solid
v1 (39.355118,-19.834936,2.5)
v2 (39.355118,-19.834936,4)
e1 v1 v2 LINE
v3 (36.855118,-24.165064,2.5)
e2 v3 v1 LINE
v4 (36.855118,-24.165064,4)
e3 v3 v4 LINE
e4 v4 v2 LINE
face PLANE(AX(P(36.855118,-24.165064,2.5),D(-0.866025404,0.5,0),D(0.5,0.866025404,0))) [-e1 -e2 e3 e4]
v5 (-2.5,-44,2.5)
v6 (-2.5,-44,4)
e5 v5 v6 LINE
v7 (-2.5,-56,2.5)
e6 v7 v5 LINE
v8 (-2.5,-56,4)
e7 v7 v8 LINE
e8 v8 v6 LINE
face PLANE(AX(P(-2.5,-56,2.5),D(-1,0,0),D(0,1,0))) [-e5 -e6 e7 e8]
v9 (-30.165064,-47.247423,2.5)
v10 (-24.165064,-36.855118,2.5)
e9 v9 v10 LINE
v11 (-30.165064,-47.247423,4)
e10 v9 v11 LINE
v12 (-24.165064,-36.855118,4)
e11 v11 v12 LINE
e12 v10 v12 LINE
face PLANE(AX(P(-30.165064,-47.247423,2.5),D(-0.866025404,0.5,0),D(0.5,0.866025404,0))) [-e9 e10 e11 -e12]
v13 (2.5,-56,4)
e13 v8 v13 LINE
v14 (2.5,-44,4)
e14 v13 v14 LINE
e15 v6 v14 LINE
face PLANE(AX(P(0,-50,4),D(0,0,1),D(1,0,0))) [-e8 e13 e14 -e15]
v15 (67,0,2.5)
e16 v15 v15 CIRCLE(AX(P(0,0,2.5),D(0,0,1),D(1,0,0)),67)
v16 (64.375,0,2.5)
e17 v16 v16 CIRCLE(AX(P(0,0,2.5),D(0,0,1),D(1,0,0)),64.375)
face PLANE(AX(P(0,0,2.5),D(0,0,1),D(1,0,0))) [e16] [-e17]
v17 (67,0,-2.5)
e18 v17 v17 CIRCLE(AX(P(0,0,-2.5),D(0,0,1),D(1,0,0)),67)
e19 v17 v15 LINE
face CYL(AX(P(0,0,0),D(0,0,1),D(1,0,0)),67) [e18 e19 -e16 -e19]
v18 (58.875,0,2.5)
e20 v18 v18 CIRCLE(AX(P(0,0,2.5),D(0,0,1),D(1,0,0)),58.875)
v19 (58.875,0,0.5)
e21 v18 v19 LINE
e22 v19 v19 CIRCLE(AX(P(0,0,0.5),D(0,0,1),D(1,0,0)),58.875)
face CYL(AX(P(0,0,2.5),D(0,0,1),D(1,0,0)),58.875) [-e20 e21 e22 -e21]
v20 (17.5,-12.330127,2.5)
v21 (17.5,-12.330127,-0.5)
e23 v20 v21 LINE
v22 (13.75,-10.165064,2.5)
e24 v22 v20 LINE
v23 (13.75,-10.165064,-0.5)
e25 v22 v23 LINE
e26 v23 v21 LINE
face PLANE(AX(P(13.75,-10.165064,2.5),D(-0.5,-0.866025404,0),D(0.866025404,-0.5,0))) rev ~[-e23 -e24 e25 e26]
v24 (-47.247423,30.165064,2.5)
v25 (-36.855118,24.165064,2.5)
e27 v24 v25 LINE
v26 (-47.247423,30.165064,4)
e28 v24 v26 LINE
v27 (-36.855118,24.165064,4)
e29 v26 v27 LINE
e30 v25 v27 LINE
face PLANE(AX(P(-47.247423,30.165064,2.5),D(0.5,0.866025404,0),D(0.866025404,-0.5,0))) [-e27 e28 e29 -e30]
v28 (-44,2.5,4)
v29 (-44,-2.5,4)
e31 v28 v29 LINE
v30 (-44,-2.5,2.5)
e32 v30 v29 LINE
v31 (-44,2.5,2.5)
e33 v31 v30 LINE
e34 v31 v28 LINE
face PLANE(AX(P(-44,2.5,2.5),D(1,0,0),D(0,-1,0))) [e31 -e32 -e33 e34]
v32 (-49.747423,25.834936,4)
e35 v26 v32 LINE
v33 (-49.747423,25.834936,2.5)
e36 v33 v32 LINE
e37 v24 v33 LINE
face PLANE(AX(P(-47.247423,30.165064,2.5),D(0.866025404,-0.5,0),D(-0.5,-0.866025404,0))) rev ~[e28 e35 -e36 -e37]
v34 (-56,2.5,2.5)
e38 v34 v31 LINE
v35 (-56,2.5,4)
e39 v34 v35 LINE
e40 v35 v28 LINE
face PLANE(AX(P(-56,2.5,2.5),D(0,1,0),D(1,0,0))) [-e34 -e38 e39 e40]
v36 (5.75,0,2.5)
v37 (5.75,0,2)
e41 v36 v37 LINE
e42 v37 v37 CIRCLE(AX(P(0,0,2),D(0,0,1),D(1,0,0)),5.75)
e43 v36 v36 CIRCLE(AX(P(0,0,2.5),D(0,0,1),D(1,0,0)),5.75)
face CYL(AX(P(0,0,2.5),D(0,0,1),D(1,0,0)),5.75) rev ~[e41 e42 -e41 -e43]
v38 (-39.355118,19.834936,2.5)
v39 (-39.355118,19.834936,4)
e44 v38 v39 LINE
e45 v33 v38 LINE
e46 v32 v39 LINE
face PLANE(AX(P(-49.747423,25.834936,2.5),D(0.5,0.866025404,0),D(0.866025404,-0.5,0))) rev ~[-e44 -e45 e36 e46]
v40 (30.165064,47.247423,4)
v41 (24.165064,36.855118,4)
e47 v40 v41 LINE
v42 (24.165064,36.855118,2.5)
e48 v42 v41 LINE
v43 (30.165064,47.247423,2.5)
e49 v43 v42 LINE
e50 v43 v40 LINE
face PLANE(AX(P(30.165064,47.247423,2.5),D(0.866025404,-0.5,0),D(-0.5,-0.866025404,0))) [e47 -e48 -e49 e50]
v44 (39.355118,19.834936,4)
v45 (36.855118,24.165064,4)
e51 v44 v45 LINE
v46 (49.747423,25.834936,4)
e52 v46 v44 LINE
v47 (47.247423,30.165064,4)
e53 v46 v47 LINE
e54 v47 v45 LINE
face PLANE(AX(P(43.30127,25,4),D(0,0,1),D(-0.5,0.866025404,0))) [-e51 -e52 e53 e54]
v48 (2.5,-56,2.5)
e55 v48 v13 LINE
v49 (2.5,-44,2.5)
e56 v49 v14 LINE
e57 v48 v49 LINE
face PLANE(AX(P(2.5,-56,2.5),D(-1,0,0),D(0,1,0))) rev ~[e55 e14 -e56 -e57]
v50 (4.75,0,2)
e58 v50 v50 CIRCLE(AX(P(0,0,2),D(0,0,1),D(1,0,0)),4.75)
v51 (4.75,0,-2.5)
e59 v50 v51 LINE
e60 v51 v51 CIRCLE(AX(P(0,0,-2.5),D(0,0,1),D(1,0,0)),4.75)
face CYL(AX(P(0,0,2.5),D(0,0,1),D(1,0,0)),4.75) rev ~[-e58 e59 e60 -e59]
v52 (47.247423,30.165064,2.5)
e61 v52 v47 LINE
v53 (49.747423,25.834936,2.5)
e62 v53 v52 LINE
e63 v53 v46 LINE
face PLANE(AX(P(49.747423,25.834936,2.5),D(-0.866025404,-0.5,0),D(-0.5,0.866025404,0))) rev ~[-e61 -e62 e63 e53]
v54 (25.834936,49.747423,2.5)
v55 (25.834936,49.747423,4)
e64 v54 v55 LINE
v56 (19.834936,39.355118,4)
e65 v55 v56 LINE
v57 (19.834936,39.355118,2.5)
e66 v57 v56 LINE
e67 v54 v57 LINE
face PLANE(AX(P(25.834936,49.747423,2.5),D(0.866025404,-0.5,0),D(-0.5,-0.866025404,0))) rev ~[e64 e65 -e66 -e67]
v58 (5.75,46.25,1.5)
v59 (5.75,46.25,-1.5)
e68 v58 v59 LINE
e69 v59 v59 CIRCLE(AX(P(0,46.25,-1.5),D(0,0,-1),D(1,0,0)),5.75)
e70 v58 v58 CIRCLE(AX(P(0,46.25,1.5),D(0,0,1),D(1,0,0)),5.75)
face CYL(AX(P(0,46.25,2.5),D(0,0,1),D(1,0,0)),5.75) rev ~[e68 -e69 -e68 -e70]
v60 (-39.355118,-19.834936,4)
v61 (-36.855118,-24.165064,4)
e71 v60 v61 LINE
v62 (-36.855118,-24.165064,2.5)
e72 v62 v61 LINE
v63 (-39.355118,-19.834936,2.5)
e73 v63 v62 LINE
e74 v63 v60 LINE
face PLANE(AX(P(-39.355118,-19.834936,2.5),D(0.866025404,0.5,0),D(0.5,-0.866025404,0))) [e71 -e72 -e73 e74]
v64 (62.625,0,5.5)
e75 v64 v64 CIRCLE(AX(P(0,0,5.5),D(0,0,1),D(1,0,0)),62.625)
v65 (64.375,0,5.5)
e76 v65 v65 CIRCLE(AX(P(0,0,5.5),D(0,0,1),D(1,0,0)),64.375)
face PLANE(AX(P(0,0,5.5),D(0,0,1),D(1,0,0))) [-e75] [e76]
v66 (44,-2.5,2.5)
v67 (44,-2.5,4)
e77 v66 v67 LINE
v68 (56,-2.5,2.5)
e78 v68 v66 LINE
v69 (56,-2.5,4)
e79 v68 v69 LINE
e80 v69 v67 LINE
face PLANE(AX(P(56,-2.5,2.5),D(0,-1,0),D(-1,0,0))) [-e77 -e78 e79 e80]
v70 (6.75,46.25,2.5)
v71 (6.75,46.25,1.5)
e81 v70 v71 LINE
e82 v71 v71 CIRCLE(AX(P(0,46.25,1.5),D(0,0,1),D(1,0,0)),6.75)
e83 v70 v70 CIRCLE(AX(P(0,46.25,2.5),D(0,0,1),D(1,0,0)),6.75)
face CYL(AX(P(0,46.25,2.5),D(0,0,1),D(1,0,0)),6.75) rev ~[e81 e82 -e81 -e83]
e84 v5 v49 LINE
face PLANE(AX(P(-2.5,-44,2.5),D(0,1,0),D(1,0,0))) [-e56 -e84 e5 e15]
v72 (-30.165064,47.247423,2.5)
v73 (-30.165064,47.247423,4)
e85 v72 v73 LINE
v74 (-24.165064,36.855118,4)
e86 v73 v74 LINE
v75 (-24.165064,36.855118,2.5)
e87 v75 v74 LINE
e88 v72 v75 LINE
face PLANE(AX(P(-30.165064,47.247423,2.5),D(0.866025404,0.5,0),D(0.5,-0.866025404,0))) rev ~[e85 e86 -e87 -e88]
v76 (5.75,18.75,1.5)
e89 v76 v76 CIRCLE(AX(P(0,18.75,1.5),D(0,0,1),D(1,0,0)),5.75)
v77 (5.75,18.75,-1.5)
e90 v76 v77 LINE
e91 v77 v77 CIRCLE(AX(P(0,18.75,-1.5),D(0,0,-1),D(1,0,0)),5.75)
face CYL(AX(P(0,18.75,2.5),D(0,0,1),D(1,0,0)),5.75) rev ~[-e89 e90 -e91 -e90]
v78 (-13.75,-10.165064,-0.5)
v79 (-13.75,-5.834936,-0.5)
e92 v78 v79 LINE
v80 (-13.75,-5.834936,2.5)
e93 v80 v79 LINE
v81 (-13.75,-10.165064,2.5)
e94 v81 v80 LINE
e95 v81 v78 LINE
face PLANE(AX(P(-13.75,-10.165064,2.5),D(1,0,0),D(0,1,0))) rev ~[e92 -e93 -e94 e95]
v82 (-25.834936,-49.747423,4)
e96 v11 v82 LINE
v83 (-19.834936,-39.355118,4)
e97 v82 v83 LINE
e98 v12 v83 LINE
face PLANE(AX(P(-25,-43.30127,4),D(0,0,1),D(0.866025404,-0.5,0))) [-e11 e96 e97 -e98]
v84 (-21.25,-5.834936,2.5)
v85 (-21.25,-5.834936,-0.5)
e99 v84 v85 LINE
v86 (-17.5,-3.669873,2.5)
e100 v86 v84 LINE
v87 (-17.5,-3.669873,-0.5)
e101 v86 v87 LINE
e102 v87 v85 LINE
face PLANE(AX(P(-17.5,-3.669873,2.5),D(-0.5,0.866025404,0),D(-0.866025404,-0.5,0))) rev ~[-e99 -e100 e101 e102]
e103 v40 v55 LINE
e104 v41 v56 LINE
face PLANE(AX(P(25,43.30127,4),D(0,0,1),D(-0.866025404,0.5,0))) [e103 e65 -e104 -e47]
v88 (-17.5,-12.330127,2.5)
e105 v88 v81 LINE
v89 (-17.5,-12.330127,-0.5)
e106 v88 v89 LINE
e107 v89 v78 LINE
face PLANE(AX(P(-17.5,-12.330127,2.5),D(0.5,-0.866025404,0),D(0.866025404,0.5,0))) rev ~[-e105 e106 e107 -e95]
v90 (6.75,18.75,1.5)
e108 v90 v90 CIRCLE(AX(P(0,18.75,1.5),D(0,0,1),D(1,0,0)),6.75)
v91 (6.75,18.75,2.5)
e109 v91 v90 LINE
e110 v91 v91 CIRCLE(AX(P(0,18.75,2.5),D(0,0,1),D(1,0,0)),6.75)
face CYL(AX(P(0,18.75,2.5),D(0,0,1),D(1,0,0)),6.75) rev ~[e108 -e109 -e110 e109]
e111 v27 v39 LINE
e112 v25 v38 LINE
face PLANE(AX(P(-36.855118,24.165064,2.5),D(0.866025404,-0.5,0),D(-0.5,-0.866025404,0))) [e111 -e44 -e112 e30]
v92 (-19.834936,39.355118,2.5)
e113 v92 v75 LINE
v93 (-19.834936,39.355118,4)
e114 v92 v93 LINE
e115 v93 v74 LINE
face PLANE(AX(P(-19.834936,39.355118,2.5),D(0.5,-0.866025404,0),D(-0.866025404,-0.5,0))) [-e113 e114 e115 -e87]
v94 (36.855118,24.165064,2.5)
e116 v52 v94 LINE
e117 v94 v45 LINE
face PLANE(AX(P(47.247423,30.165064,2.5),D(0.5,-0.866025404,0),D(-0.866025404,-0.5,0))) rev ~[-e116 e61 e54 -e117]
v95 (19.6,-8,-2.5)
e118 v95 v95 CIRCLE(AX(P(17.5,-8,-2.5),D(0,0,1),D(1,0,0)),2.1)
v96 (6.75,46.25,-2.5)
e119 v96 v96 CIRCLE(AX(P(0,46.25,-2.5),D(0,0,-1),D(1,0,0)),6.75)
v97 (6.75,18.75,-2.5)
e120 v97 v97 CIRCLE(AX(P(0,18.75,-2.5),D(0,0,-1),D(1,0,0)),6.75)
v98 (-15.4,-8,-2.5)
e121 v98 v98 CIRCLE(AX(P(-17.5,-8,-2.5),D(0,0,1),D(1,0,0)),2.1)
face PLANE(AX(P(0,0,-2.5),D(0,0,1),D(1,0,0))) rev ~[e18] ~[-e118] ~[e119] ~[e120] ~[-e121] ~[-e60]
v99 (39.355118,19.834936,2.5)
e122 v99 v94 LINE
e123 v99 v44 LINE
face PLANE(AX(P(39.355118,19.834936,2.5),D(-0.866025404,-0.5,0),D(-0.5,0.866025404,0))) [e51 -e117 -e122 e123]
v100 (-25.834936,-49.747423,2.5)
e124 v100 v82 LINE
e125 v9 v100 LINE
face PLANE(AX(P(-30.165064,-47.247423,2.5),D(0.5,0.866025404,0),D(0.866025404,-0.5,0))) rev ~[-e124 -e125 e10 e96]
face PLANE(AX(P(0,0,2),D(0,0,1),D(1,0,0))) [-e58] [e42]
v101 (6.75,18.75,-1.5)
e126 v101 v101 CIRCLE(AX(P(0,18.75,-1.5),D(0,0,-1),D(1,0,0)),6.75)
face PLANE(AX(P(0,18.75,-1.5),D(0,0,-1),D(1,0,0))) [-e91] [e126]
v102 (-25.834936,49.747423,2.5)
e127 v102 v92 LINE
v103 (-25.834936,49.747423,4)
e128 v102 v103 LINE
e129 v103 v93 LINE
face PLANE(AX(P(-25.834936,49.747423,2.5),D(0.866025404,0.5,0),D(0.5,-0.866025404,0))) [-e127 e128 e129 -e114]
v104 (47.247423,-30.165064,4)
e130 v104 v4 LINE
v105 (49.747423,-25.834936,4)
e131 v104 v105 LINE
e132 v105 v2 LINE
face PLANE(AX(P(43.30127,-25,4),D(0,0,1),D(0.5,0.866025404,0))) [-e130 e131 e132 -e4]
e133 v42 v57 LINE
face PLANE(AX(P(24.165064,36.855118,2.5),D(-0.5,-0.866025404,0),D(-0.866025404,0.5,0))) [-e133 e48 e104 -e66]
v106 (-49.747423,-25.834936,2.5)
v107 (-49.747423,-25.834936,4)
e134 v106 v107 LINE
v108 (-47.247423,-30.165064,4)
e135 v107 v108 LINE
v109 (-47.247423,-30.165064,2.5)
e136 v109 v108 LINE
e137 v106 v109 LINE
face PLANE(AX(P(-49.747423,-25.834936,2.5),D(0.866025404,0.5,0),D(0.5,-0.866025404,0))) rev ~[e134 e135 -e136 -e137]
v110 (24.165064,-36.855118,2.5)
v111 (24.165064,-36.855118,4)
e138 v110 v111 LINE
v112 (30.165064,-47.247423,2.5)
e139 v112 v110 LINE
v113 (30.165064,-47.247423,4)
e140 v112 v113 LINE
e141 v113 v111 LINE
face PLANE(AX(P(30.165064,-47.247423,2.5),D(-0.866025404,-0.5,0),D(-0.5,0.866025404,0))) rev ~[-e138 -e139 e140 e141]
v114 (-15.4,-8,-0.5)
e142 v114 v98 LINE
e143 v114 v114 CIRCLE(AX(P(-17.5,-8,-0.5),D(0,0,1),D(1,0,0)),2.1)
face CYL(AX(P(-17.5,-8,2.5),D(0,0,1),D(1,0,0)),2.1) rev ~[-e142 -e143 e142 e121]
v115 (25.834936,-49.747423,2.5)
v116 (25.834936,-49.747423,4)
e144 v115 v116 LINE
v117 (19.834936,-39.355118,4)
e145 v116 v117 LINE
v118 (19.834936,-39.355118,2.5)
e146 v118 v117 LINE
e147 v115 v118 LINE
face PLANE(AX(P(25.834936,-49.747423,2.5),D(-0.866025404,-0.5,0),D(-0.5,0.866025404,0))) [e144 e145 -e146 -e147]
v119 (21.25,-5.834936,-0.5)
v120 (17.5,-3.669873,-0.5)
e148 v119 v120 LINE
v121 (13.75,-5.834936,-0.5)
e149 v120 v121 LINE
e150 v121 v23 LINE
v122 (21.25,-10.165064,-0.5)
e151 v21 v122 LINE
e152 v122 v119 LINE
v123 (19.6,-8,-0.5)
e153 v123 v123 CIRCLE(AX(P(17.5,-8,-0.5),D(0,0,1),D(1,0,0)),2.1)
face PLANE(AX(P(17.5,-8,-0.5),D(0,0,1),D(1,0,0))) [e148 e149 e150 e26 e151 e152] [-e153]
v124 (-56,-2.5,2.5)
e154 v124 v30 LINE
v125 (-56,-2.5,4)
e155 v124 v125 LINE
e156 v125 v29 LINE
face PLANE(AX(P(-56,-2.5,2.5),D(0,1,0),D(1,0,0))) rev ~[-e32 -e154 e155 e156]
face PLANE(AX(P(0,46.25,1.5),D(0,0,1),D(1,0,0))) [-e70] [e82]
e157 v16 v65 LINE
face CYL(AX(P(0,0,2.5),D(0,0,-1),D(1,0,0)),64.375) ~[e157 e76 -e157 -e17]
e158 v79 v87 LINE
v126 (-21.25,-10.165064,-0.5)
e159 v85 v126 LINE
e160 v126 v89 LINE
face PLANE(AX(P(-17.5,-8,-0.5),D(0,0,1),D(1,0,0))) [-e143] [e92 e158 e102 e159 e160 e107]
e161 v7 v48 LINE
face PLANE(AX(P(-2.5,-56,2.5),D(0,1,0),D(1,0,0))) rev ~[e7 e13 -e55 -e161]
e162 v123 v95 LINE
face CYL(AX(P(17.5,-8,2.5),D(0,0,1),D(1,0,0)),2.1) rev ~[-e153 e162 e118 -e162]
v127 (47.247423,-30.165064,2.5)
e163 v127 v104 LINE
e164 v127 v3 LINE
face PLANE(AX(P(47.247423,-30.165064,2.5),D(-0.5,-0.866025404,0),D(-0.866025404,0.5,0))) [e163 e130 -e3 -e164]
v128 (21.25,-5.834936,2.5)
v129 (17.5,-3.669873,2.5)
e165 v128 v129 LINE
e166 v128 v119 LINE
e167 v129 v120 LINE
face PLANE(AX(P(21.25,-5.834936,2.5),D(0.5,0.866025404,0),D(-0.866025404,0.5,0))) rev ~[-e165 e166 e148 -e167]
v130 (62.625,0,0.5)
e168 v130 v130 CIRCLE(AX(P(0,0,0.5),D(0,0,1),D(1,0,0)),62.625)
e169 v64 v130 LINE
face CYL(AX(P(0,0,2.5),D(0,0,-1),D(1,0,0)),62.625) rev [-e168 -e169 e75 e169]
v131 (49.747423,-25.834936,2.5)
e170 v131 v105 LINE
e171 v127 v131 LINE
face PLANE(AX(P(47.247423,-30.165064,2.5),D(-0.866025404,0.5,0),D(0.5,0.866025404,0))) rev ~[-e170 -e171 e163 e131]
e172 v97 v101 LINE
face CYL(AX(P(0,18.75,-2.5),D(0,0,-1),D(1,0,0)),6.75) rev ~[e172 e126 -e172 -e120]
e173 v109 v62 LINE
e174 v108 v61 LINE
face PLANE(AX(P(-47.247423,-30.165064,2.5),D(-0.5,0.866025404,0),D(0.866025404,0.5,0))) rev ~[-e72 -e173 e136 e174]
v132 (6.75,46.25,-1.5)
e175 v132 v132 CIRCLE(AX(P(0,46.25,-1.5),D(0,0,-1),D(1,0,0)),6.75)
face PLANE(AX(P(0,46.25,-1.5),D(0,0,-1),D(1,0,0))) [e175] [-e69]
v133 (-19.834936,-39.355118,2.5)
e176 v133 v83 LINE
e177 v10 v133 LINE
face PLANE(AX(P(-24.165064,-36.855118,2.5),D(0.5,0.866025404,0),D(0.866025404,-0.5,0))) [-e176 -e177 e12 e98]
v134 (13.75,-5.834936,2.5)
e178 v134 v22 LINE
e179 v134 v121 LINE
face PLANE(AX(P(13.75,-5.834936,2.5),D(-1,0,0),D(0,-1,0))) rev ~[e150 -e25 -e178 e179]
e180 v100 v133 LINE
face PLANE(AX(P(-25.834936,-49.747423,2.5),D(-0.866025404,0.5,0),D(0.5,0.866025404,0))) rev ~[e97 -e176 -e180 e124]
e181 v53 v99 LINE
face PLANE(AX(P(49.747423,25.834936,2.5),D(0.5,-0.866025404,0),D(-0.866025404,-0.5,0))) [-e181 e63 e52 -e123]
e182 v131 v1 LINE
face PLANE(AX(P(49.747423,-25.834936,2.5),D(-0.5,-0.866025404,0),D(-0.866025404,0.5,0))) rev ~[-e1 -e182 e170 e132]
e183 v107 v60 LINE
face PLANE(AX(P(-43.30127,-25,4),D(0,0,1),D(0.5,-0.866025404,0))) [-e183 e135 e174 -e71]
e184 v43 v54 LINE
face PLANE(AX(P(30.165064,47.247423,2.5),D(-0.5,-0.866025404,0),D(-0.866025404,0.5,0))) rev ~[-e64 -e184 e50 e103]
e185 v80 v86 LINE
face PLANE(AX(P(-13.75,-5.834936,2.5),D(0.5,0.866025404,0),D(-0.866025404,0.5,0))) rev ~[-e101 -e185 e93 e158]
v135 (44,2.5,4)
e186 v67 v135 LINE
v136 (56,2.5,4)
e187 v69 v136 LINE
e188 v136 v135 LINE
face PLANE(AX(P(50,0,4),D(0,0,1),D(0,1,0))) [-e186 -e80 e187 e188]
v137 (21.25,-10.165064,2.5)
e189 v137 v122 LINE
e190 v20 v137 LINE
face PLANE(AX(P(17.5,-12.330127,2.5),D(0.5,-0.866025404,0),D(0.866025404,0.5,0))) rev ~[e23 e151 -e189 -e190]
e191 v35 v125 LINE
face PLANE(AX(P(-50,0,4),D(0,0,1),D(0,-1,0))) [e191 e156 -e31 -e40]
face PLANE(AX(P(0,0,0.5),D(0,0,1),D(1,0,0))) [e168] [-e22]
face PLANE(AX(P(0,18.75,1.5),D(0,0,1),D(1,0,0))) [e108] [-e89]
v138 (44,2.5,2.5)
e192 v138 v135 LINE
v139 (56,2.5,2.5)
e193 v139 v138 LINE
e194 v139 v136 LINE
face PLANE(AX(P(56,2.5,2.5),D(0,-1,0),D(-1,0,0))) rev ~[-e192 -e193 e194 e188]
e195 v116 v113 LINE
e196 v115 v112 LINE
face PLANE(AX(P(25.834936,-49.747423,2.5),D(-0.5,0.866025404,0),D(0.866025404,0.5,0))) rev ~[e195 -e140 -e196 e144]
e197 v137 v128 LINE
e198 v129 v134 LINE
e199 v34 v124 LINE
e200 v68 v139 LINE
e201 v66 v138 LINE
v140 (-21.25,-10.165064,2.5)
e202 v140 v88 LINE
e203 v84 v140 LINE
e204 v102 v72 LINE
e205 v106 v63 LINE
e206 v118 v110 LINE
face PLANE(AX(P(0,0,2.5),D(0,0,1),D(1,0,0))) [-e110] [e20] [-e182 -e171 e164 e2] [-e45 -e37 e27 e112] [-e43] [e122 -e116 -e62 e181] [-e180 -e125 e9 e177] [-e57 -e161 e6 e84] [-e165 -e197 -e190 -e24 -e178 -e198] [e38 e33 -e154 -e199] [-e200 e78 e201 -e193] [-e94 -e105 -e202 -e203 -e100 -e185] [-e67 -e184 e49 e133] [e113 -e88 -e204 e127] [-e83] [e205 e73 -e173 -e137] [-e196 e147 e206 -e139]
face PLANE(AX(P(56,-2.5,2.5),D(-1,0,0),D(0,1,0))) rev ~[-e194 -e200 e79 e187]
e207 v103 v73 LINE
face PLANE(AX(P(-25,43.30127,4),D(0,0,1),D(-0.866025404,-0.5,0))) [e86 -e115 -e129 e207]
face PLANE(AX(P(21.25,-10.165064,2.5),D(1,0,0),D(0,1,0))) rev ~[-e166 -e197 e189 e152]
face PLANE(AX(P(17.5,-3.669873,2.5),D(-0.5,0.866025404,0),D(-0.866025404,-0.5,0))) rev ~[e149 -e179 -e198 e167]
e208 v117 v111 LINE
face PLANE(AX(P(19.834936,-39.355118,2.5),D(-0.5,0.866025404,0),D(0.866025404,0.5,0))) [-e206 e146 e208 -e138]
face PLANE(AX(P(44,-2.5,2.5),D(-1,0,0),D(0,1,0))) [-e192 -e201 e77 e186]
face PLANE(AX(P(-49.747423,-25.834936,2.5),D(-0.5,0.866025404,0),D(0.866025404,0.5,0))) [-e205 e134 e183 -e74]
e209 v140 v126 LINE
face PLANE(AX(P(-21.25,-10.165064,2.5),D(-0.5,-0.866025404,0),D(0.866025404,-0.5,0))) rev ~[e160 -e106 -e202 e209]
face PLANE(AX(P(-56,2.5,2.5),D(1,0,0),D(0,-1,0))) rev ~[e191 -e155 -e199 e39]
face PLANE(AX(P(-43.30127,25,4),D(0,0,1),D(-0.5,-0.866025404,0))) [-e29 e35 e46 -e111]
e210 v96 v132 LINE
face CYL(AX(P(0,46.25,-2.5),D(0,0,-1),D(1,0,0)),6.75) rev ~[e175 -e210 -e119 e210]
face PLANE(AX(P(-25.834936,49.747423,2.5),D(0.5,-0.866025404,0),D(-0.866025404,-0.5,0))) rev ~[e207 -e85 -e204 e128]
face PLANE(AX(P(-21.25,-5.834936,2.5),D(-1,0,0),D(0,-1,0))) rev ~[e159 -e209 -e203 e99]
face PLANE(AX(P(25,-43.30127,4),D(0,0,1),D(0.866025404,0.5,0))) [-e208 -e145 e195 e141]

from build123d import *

# Parameters (mm, degrees)
F0_R              = 67
F1_DEPTH          = 2.5
F2_R              = 64.375
F2_R_2            = 62.625
F3_DEPTH          = 3
F2_R_3            = 58.875
F4_DEPTH          = 2
F5_R              = 4.75
F5_R_2            = 5.75
F5_R_3            = 2.1
F6_DEPTH          = 25
F7_R              = 5.75
F7_R_2            = 4.75
F8_DEPTH          = 0.5
F7_R_3            = 6.75
F9_DEPTH          = 1
F7_R_4            = 2.1
F10_DEPTH         = 3
F11_R             = 6.75
F11_R_2           = 5.75
F12_DEPTH         = 1
F13_W             = 5
F13_H             = 12
F14_DEPTH         = 1.5
F14_COPIES_COUNT  = 6
F14_COPIES_ANGLE  = 150
F14_COPIES1_COUNT = 6
F14_COPIES1_ANGLE = 150


# Not quite as in the source:
# - a feature of the source that left no trace in its solid (it failed there, or was rolled back) is left out
# - a pattern or mirror of a feature is missing from the dataset's text; its kind, count and spacing are read off the source's solid


with BuildPart() as f1:
    # F0 (on Top) → F1 (new body, symmetric)
    with BuildSketch(Plane.XY):
        Circle(F0_R)
    extrude(amount=F1_DEPTH, both=True)

    # F2 (on face) → F3 (join)
    with BuildSketch(Plane.XY.offset(2.5)):
        Circle(F2_R)
        Circle(F2_R_2, mode=Mode.SUBTRACT)
    extrude(amount=F3_DEPTH)

    # F2 (on face) → F4 (cut)
    with BuildSketch(Plane.XY.offset(2.5)):
        Circle(F2_R_2)
        Circle(F2_R_3, mode=Mode.SUBTRACT)
    extrude(amount=-F4_DEPTH, mode=Mode.SUBTRACT)

    # F5 (on face) → F6 (cut)
    with BuildSketch(Plane.XY.offset(2.5)):
        Circle(F5_R)
        with Locations((0, 18.75)):
            Circle(F5_R_2)
        with Locations((0, 46.25)):
            Circle(F5_R_2)
        with Locations((17.5, -8)):
            Circle(F5_R_3)
        with Locations((-17.5, -8)):
            Circle(F5_R_3)
    extrude(amount=-F6_DEPTH, mode=Mode.SUBTRACT)

    # F7 (on face) → F8 (cut)
    with BuildSketch(Plane.XY.offset(2.5)):
        Circle(F7_R)
        Circle(F7_R_2, mode=Mode.SUBTRACT)
    extrude(amount=-F8_DEPTH, mode=Mode.SUBTRACT)

    # F7 (on face) → F9 (cut)
    with BuildSketch(Plane.XY.offset(2.5)):
        with Locations((0, 18.75)):
            Circle(F7_R_3)
        with Locations((0, 18.75)):
            Circle(F7_R, mode=Mode.SUBTRACT)
        with Locations((0, 46.25)):
            Circle(F7_R_3)
        with Locations((0, 46.25)):
            Circle(F7_R, mode=Mode.SUBTRACT)
    extrude(amount=-F9_DEPTH, mode=Mode.SUBTRACT)

    # F7 (on face) → F10 (cut)
    with BuildSketch(Plane.XY.offset(2.5)):
        Polygon((-13.75, -10.1650635095), (-13.75, -5.8349364905), (-17.5, -3.6698729811), (-21.25, -5.8349364905), (-21.25, -10.1650635095), (-17.5, -12.3301270189), align=None)
        with Locations((-17.5, -8)):
            Circle(F7_R_4, mode=Mode.SUBTRACT)
        Polygon((21.25, -10.1650635095), (21.25, -5.8349364905), (17.5, -3.6698729811), (13.75, -5.8349364905), (13.75, -10.1650635095), (17.5, -12.3301270189), align=None)
        with Locations((17.5, -8)):
            Circle(F7_R_4, mode=Mode.SUBTRACT)
    extrude(amount=-F10_DEPTH, mode=Mode.SUBTRACT)

    # F11 (on face) → F12 (cut)
    with BuildSketch(Plane(origin=(0, 0, -2.5), x_dir=(1, 0, 0), z_dir=(0, 0, -1))):
        with Locations((0, -18.75)):
            Circle(F11_R)
        with Locations((0, -18.75)):
            Circle(F11_R_2, mode=Mode.SUBTRACT)
        with Locations((0, -46.25)):
            Circle(F11_R)
        with Locations((0, -46.25)):
            Circle(F11_R_2, mode=Mode.SUBTRACT)
    extrude(amount=-F12_DEPTH, mode=Mode.SUBTRACT)

    # F13 (on face) → F14 (join)
    with BuildSketch(Plane.XY.offset(2.5)):
        with Locations((0, -50)):
            Rectangle(F13_W, F13_H)
    f14 = extrude(amount=F14_DEPTH)

    # F14_copies: F14 ×6 about axis
    f14_copies_axis = Axis((0, 0, 0), (0, 0, 1))
    for i in range(1, F14_COPIES_COUNT):
        add(f14.rotate(f14_copies_axis, i * F14_COPIES_ANGLE / (F14_COPIES_COUNT - 1)))

    # F14_copies1: F14 ×6 about axis
    f14_copies1_axis = Axis((0, 0, 0), (0, 0, -1))
    for i in range(1, F14_COPIES1_COUNT):
        add(f14.rotate(f14_copies1_axis, i * F14_COPIES1_ANGLE / (F14_COPIES1_COUNT - 1)))


solid = f1.part
